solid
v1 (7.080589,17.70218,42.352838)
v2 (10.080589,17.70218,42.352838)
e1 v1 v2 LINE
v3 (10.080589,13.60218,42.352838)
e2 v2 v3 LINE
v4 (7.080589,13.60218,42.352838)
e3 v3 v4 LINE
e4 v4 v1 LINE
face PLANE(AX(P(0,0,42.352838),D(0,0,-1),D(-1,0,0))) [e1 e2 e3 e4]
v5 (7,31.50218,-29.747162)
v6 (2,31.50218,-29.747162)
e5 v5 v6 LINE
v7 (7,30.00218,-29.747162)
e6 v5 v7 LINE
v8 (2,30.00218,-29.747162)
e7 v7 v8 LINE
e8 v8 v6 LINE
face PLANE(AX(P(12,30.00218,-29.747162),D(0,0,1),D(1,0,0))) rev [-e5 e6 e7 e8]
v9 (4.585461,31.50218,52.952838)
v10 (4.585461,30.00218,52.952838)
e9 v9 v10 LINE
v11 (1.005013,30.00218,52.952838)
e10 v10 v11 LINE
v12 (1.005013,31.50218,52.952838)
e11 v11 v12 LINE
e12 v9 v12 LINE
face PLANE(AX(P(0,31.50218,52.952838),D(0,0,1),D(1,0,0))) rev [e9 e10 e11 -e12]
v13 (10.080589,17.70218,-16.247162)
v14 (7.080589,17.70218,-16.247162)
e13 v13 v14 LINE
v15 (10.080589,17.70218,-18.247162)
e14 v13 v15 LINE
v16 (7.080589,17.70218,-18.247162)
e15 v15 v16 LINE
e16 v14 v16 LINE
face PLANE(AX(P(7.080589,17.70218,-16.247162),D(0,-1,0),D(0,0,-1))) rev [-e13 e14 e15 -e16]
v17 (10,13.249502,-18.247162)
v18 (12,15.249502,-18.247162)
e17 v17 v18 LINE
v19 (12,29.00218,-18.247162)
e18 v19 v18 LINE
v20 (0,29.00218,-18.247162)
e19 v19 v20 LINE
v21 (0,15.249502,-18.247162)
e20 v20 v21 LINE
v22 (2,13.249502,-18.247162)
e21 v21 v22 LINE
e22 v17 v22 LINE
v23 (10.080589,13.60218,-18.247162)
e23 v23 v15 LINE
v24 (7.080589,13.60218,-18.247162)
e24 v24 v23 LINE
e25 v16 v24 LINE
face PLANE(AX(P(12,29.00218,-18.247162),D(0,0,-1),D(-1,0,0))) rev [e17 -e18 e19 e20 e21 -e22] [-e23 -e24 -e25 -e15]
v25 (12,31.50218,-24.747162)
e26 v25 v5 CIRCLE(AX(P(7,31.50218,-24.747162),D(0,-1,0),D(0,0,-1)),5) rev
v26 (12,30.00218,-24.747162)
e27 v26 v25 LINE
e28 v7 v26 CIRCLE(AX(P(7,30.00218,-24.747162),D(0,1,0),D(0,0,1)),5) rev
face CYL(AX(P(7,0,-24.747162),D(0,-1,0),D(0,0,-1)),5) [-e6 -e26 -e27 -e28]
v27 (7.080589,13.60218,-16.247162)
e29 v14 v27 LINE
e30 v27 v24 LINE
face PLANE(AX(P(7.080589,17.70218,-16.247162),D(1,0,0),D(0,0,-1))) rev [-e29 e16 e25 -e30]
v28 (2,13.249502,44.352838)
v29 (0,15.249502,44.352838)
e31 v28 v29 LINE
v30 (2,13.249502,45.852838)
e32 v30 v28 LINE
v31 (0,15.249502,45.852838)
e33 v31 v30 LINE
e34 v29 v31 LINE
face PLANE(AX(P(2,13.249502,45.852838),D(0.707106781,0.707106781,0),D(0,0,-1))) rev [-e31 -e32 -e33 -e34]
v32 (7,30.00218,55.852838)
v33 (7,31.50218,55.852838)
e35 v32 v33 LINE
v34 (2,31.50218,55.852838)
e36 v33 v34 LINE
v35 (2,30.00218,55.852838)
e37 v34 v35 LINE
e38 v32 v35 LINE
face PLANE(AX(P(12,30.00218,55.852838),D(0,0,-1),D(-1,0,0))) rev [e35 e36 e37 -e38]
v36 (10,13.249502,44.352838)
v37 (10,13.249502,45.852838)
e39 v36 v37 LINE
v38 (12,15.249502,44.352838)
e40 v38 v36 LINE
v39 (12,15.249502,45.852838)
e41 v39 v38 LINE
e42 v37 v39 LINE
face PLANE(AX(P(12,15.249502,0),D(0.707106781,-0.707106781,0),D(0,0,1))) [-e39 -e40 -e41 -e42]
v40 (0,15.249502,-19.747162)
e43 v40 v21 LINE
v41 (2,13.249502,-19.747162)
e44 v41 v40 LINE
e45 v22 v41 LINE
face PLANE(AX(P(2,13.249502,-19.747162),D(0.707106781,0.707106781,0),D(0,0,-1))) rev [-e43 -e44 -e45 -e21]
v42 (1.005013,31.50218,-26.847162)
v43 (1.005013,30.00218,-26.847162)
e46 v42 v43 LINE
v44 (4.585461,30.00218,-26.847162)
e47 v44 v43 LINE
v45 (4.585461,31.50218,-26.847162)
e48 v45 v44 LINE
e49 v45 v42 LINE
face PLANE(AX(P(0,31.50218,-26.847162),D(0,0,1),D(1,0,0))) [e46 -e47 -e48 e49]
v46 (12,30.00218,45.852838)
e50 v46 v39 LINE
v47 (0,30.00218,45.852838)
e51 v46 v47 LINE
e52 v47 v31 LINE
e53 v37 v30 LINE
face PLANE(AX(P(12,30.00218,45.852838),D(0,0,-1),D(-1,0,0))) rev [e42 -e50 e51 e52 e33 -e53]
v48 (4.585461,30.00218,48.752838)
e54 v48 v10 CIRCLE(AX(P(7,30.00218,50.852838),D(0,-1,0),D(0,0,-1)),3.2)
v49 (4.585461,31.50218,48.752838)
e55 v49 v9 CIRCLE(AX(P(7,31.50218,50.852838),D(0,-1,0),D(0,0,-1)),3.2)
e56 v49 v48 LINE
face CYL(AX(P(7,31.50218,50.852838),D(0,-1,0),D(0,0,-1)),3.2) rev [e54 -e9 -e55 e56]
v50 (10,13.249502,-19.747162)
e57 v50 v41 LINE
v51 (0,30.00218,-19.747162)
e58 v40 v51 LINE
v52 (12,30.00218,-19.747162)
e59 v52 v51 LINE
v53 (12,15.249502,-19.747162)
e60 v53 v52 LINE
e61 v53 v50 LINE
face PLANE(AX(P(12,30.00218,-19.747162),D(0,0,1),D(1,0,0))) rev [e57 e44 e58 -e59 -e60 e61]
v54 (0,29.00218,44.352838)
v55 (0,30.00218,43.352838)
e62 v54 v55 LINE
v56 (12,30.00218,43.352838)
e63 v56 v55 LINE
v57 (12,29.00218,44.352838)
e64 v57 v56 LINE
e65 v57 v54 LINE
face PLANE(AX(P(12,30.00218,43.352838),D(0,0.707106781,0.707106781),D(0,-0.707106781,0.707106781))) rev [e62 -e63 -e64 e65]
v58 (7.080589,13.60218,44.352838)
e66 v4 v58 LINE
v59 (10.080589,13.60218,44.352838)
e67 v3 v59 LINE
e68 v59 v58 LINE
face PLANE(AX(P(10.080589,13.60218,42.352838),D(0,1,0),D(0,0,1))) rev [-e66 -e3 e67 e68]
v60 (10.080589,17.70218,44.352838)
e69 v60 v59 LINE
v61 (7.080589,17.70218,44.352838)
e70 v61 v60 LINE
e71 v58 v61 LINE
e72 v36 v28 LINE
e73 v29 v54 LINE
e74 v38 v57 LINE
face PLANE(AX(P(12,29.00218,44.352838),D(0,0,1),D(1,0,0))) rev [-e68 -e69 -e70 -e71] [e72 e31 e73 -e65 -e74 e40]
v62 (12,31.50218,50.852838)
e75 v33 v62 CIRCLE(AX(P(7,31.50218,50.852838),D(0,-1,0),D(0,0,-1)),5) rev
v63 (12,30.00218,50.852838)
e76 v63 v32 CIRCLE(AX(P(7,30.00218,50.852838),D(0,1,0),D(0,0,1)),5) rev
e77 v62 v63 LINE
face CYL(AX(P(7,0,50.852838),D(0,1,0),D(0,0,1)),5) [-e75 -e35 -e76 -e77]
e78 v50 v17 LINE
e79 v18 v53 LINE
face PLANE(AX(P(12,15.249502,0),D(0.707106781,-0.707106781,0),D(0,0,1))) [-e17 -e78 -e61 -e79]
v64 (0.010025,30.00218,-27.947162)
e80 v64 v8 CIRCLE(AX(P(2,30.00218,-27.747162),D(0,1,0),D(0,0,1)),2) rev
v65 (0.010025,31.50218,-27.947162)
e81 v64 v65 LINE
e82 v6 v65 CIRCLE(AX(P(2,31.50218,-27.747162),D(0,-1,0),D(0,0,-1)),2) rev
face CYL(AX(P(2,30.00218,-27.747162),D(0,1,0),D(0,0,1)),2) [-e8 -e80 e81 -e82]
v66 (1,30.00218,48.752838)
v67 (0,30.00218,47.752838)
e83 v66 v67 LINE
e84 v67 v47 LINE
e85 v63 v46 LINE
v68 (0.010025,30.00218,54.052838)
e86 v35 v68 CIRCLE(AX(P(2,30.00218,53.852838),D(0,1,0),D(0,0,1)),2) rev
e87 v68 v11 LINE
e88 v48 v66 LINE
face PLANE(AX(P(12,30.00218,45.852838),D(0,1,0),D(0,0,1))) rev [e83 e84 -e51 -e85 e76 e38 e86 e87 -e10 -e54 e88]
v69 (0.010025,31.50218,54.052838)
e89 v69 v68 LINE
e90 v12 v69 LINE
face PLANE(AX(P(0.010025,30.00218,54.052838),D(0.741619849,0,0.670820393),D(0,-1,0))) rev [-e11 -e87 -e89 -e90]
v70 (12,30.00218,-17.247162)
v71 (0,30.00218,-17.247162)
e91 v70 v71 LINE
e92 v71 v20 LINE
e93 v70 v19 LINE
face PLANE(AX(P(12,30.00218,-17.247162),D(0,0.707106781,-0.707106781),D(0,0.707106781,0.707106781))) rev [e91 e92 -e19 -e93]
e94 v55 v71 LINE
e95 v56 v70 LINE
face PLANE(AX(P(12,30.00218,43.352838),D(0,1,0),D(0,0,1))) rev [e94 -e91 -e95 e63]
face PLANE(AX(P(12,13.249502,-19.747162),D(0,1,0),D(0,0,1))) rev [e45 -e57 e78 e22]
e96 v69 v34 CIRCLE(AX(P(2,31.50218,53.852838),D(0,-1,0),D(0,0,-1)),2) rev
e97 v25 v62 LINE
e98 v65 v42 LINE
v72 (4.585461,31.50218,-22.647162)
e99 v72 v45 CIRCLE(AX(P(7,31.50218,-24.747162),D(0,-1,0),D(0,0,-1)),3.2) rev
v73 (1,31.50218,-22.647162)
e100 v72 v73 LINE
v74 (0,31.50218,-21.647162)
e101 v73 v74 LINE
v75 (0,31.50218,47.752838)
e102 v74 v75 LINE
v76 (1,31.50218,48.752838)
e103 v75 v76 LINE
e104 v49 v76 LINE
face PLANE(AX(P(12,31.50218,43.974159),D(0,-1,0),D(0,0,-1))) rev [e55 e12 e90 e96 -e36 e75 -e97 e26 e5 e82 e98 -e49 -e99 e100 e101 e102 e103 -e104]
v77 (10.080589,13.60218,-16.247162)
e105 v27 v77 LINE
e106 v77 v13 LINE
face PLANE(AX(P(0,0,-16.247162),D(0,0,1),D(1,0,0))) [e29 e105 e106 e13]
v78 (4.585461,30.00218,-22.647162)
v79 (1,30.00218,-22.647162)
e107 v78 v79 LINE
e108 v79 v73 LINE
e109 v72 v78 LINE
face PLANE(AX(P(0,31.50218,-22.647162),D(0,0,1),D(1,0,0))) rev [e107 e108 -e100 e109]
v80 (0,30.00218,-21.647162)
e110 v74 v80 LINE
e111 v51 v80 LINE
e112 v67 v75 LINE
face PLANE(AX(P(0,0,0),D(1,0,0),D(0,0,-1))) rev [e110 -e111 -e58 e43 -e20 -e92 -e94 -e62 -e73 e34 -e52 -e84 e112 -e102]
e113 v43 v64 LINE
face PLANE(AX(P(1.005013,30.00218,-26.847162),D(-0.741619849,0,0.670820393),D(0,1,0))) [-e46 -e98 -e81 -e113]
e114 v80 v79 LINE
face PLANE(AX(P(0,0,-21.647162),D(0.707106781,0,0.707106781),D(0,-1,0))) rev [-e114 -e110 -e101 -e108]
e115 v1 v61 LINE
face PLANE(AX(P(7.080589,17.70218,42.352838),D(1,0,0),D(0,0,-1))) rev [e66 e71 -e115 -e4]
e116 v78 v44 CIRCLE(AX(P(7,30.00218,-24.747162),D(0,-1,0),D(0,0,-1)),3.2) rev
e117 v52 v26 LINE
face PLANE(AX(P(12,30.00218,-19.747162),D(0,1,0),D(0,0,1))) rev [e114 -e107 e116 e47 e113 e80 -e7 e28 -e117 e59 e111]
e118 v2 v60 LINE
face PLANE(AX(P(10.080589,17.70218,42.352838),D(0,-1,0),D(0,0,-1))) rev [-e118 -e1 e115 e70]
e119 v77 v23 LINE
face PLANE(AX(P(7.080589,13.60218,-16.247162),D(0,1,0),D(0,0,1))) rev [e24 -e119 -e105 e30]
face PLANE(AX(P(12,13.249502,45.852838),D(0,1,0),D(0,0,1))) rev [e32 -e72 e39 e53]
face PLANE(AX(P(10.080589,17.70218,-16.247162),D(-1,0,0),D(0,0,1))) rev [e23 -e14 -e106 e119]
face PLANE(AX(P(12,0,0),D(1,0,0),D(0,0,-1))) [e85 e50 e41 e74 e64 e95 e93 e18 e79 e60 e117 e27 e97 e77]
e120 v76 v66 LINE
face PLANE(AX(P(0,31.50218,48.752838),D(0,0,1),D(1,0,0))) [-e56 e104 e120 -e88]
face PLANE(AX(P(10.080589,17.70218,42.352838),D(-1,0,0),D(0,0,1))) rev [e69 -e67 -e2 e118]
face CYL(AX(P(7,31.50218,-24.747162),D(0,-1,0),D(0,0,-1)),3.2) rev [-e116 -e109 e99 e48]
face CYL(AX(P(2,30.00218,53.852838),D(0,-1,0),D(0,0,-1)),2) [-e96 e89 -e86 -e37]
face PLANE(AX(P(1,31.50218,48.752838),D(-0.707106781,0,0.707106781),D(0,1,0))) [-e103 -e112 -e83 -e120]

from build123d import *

# Parameters (mm, degrees)
BOSS_EXTRUDE1_DEPTH = 12
CUT_EXTRUDE1_DEPTH  = 60.533114979
FILLET1_R           = 5
FILLET2_R           = 2
CHAMFER1_START      = 29
CHAMFER1_DEPTH      = 4
CHAMFER2_SIZE       = 2
SKETCH3_W           = 3
SKETCH3_H           = 4.1
BOSS_EXTRUDE2_DEPTH = 2
SKETCH4_W           = 3
SKETCH4_H           = 4.1
BOSS_EXTRUDE3_DEPTH = 2


with BuildPart() as part:
    # Sketch1 → Boss-Extrude1 (new body)
    with BuildSketch(Plane(origin=(0, 0, 0), x_dir=(0, 0, -1), z_dir=(1, 0, 0))):
        Polygon((-43.352838341, 30.002180144), (17.247161659, 30.002180144), (18.247161659, 29.002180144), (18.247161659, 13.2495019), (19.747161659, 13.2495019), (19.747161659, 30.002180144), (29.747161659, 30.002180144), (29.747161659, 31.502180144), (17.868482003, 31.502180144), (-43.974158684, 31.502180144), (-55.852838341, 31.502180144), (-55.852838341, 30.002180144), (-45.852838341, 30.002180144), (-45.852838341, 13.2495019), (-44.352838341, 13.2495019), (-44.352838341, 29.002180144), align=None)
    extrude(amount=BOSS_EXTRUDE1_DEPTH)

    # Sketch2 → Cut-Extrude1 (cut, through all)
    with BuildSketch(Plane.XZ.offset(-30.002180144)):
        with BuildLine():
            ThreePointArc((4.585460706, 48.752838341), (10.2, 50.852838341), (4.585460706, 52.952838341))
            Line((4.585460706, 52.952838341), (0, 52.952838341))
            Line((0, 52.952838341), (0, 48.752838341))
            Line((0, 48.752838341), (4.585460706, 48.752838341))
        make_face()
        with BuildLine():
            ThreePointArc((4.585460706, -22.647161659), (10.2, -24.747161659), (4.585460706, -26.847161659))
            Line((4.585460706, -26.847161659), (0, -26.847161659))
            Line((0, -26.847161659), (0, -22.647161659))
            Line((0, -22.647161659), (4.585460706, -22.647161659))
        make_face()
    extrude(amount=-CUT_EXTRUDE1_DEPTH, mode=Mode.SUBTRACT)

    # Fillet1
    fillet1_edges = [part.edges().sort_by_distance(p)[0] for p in [
        (12, 30.752180144, -29.747161659),
        (12, 30.752180144, 55.852838341),
    ]]
    fillet(fillet1_edges, radius=FILLET1_R)

    # Fillet2
    fillet2_edges = [part.edges().sort_by_distance(p)[0] for p in [
        (0, 30.752180144, 55.852838341),
        (0, 30.752180144, -29.747161659),
    ]]
    fillet(fillet2_edges, radius=FILLET2_R)

    # Chamfer1: read off the stored shape, not the designer's step
    # Chamfer1 outline → Chamfer1 (cut)
    with BuildSketch(Plane(origin=(0, 0, 0), x_dir=(1, 0, 0), z_dir=(0, 1, 0)).offset(CHAMFER1_START)):
        with BuildLine():
            Line((1.005012563, 26.847161659), (0.010025126, 27.947161659))
            ThreePointArc((0.010025126, 27.947161659), (0.002507854, 27.847287209), (0, 27.747161659))
            Line((0, 27.747161659), (0, 26.847161659))
            Line((0, 26.847161659), (1.005012563, 26.847161659))
        make_face()
        Polygon((0, 22.647161659), (0, 21.647161659), (1, 22.647161659), align=None)
        Polygon((1, -48.752838341), (0, -47.752838341), (0, -48.752838341), align=None)
        with BuildLine():
            ThreePointArc((0, -53.852838341), (0.002507854, -53.952963891), (0.010025126, -54.052838341))
            Line((0.010025126, -54.052838341), (1.005012563, -52.952838341))
            Line((1.005012563, -52.952838341), (0, -52.952838341))
            Line((0, -52.952838341), (0, -53.852838341))
        make_face()
    extrude(amount=CHAMFER1_DEPTH, mode=Mode.SUBTRACT)

    # Chamfer2
    chamfer2_edges = [part.edges().sort_by_distance(p)[0] for p in [
        (0, 13.2495019, 45.102838341),
        (12, 13.2495019, -18.997161659),
        (0, 13.2495019, -18.997161659),
        (12, 13.2495019, 45.102838341),
    ]]
    chamfer(chamfer2_edges, length=CHAMFER2_SIZE)

    # Sketch3 → Boss-Extrude2 (add)
    with BuildSketch(Plane(origin=(0, 0, 44.352838341), x_dir=(-1, 0, 0), z_dir=(0, 0, -1))):
        with Locations((-8.580589258, 15.652180144)):
            Rectangle(SKETCH3_W, SKETCH3_H)
    extrude(amount=BOSS_EXTRUDE2_DEPTH)

    # Sketch4 → Boss-Extrude3 (add)
    with BuildSketch(Plane.XY.offset(-18.247161659)):
        with Locations((8.580589258, 15.652180144)):
            Rectangle(SKETCH4_W, SKETCH4_H)
    extrude(amount=BOSS_EXTRUDE3_DEPTH)


solid = part.part
